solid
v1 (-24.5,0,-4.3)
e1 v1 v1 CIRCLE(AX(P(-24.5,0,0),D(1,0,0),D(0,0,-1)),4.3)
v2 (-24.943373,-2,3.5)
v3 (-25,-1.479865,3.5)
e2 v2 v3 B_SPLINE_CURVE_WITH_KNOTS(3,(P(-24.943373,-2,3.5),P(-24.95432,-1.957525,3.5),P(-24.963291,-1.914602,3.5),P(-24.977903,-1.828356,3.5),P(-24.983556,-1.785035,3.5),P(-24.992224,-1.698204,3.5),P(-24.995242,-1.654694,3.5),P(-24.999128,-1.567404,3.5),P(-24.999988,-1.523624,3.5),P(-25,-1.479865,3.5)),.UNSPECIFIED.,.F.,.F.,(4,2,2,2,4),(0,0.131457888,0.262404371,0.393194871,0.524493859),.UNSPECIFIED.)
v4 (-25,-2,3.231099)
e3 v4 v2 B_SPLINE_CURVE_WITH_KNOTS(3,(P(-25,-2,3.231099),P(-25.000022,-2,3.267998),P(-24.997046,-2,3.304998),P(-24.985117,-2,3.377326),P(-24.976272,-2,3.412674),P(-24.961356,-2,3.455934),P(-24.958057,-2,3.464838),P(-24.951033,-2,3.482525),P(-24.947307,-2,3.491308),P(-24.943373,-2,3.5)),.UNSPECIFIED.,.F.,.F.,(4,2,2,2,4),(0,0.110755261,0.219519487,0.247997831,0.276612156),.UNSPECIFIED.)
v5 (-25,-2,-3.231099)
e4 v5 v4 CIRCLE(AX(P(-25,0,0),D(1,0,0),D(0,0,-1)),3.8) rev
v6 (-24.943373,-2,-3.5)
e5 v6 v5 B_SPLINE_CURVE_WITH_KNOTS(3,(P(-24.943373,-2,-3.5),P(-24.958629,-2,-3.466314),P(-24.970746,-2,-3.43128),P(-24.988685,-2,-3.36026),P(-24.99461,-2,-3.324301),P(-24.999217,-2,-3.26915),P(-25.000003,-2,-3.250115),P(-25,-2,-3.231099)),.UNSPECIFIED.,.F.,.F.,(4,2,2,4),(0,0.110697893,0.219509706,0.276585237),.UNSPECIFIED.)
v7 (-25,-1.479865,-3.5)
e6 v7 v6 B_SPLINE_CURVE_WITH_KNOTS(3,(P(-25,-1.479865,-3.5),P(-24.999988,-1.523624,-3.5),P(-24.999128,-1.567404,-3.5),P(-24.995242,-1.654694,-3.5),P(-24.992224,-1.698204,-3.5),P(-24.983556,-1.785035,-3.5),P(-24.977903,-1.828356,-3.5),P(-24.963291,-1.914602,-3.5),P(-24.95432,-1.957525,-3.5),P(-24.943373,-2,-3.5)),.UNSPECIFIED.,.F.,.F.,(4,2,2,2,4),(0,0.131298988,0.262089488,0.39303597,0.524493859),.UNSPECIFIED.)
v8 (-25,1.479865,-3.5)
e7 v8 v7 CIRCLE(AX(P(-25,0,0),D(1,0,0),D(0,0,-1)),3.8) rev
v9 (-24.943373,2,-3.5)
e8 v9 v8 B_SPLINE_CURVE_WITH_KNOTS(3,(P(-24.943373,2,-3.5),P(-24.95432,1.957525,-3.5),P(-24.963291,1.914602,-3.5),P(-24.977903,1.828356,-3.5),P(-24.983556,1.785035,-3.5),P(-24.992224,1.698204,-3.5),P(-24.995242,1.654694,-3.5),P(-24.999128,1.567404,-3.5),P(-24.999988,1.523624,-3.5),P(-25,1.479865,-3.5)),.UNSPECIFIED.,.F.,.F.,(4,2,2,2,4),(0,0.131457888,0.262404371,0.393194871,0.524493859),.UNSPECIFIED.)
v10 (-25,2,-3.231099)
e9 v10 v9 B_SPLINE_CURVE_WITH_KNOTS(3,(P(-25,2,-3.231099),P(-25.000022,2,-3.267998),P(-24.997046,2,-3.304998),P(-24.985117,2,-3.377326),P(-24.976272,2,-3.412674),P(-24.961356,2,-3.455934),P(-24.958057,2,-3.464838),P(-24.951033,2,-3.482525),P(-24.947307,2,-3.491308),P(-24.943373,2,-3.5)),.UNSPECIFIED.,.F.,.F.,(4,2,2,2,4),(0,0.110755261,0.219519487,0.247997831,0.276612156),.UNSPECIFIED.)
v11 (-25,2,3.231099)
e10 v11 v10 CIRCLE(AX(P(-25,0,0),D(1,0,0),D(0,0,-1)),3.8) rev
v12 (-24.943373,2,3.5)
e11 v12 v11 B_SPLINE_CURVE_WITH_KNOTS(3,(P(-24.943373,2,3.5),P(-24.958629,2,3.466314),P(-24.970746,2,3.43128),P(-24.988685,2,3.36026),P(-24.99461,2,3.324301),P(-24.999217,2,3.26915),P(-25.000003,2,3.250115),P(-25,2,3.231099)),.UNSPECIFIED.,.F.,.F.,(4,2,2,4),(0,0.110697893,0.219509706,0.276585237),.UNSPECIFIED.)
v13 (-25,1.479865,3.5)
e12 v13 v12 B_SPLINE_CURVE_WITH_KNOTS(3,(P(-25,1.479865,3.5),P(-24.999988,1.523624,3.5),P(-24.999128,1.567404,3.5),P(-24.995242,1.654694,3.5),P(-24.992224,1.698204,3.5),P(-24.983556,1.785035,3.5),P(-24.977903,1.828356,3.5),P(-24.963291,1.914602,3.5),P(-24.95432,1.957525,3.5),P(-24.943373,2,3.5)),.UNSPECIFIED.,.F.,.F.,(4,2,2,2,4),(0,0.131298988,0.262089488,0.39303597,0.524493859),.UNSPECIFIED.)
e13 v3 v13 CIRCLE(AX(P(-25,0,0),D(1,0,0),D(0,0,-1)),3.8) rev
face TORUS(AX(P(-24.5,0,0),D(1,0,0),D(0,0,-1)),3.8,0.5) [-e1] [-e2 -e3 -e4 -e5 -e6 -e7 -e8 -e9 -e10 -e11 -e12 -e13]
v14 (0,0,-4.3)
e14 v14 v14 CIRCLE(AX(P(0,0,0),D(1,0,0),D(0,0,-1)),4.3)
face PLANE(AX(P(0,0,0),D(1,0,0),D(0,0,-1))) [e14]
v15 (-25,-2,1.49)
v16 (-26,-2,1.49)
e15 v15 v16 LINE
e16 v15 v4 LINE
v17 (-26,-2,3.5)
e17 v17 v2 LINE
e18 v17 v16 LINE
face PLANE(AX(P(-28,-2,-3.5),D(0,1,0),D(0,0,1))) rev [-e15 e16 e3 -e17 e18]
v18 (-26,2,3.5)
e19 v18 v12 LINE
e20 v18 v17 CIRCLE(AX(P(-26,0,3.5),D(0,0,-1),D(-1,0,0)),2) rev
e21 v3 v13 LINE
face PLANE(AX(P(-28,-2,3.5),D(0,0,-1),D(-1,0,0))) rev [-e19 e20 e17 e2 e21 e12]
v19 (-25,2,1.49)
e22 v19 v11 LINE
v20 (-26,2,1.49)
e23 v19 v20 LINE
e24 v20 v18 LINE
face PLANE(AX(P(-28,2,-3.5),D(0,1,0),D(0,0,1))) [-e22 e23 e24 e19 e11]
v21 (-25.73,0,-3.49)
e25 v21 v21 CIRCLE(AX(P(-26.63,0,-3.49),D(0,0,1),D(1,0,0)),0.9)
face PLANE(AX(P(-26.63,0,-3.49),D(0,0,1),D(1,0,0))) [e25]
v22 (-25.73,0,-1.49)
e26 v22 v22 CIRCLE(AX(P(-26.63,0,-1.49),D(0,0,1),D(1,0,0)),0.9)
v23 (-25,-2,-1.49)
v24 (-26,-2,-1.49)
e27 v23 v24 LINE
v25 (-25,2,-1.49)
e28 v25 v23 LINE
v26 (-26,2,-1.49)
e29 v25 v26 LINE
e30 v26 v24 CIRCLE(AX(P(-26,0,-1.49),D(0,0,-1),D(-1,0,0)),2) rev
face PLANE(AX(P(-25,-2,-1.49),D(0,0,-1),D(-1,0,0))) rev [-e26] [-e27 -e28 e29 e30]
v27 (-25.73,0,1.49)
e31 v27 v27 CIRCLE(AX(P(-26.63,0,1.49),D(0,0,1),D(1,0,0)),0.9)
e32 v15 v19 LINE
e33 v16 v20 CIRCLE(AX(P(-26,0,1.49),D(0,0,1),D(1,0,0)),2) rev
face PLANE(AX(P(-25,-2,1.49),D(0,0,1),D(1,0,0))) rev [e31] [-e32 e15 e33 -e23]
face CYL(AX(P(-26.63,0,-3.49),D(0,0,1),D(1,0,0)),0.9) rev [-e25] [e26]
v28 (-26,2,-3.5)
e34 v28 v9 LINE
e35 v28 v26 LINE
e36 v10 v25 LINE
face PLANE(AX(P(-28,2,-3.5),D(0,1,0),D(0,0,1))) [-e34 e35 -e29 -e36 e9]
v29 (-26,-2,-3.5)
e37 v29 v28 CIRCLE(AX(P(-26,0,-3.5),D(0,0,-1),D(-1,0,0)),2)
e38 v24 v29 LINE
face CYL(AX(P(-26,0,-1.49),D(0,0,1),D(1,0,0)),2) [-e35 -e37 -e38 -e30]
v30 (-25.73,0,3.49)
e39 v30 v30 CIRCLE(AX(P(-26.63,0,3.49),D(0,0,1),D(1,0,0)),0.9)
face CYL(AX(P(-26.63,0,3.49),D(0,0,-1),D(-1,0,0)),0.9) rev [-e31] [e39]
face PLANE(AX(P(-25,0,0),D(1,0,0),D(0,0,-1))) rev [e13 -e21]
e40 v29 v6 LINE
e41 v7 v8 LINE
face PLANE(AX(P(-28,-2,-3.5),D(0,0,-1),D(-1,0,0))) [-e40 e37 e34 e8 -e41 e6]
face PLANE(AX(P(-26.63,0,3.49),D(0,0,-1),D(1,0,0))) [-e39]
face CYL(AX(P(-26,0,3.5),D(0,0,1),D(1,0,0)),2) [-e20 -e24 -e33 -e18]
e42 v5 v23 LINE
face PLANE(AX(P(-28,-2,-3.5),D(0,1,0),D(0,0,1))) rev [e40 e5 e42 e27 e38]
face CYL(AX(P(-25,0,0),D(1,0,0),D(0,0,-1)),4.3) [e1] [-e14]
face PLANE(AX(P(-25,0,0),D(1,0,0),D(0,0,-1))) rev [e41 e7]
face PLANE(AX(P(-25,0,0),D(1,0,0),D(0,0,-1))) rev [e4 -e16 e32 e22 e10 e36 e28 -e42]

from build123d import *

# Parameters (mm, degrees)
ESBO_O4_R                = 4.3
RESSALTO_EXTRUS_O1_DEPTH = 25
ESBO_O5_W                = 7
ESBO_O5_H                = 4
RESSALTO_EXTRUS_O4_DEPTH = 3
ESBO_O7_W                = 2.98
ESBO_O7_H                = 4
CORTE_EXTRUS_O2_DEPTH    = 3
ESBO_O8_R                = 0.9
CORTE_EXTRUS_O3_DEPTH    = 2
FILETE2_RADIUS           = 2
FILETE2_LENGTH           = 2.01
FILETE3_RADIUS           = 2
FILETE3_LENGTH           = 2.01
FILETE4_R                = 0.5


with BuildPart() as part:
    # Esboço4 → Ressalto-extrusão1 (new body)
    with BuildSketch(Plane(origin=(0, 0, 0), x_dir=(0, 0, -1), z_dir=(1, 0, 0))):
        Circle(ESBO_O4_R)
    extrude(amount=-RESSALTO_EXTRUS_O1_DEPTH)

    # Esboço5 → Ressalto-extrusão4 (add)
    with BuildSketch(Plane.ZY.offset(25)):
        Rectangle(ESBO_O5_W, ESBO_O5_H)
    extrude(amount=RESSALTO_EXTRUS_O4_DEPTH)

    # Esboço7 → Corte-extrusão2 (cut)
    with BuildSketch(Plane.ZY.offset(28)):
        Rectangle(ESBO_O7_W, ESBO_O7_H)
    extrude(amount=-CORTE_EXTRUS_O2_DEPTH, mode=Mode.SUBTRACT)

    # Esboço8 → Corte-extrusão3 (cut)
    with BuildSketch(Plane.XY.offset(-1.49)):
        with Locations((-26.63, 0)):
            Circle(ESBO_O8_R)
    corte_extrus_o3 = extrude(amount=-CORTE_EXTRUS_O3_DEPTH, mode=Mode.SUBTRACT)

    # Filete2: full round fillet: the end face becomes a half cylinder, R = half its width
    filete2_face = Plane((-28, 0, -2.495), x_dir=(0, 0, -1), z_dir=(-1, 0, 0))  # on the end face: x along it, z out of the body
    filete2_slab = filete2_face.offset(-FILETE2_RADIUS / 2) * Box(FILETE2_LENGTH, 2 * FILETE2_RADIUS, FILETE2_RADIUS, mode=Mode.PRIVATE)  # the body's end, R deep
    filete2_round = Plane((-26, 0, -2.495), x_dir=(-1, 0, 0), z_dir=(0, 0, -1)) * Cylinder(FILETE2_RADIUS, FILETE2_LENGTH, mode=Mode.PRIVATE)  # its axis R under the face
    add(filete2_slab - filete2_round, mode=Mode.SUBTRACT)

    # Espelhar7: Corte-extrusão3 across plane
    add(corte_extrus_o3.mirror(Plane.XY), mode=Mode.SUBTRACT)

    # Filete3: full round fillet: the end face becomes a half cylinder, R = half its width
    filete3_face = Plane((-28, 0, 2.495), x_dir=(0, 0, 1), z_dir=(-1, 0, 0))  # on the end face: x along it, z out of the body
    filete3_slab = filete3_face.offset(-FILETE3_RADIUS / 2) * Box(FILETE3_LENGTH, 2 * FILETE3_RADIUS, FILETE3_RADIUS, mode=Mode.PRIVATE)  # the body's end, R deep
    filete3_round = Plane((-26, 0, 2.495), x_dir=(-1, 0, 0), z_dir=(0, 0, 1)) * Cylinder(FILETE3_RADIUS, FILETE3_LENGTH, mode=Mode.PRIVATE)  # its axis R under the face
    add(filete3_slab - filete3_round, mode=Mode.SUBTRACT)

    # Filete4
    # the kernel refuses this fillet: 0.5 mm, written as the material it takes off along each edge
    with BuildSketch(Plane(origin=(-25, 0, 0), x_dir=(0, 0, -1), z_dir=(0, -1, 0))) as filete4_piece_1_section:
        with BuildLine():
            CenterArc((4.3 - FILETE4_R, FILETE4_R), FILETE4_R, 270, 90)
            Line((4.3 - FILETE4_R, 0), (4.3, 0))
            Line((4.3, 0), (4.3, FILETE4_R))
        make_face()
    filete4_piece_1 = revolve(axis=Axis((-25, 0, 0), (1, 0, 0)), mode=Mode.PRIVATE)
    filete4_piece_1 = split(filete4_piece_1, bisect_by=Plane(origin=(-24.857838708, 1.067183876, -3.5), z_dir=(0, 0, -1)), keep=Keep.TOP, mode=Mode.PRIVATE)
    add(filete4_piece_1, mode=Mode.SUBTRACT)
    with BuildSketch(Plane(origin=(-25, 0, 0), x_dir=(0, 0, -1), z_dir=(0, -1, 0))) as filete4_piece_2_section:
        with BuildLine():
            CenterArc((4.3 - FILETE4_R, FILETE4_R), FILETE4_R, 270, 90)
            Line((4.3 - FILETE4_R, 0), (4.3, 0))
            Line((4.3, 0), (4.3, FILETE4_R))
        make_face()
    filete4_piece_2 = revolve(axis=Axis((-25, 0, 0), (1, 0, 0)), mode=Mode.PRIVATE)
    filete4_piece_2 = split(filete4_piece_2, bisect_by=Plane(origin=(-24.858947412, 2, 0), z_dir=(0, 1, 0)), keep=Keep.TOP, mode=Mode.PRIVATE)
    add(filete4_piece_2, mode=Mode.SUBTRACT)
    with BuildSketch(Plane(origin=(-25, 0, 0), x_dir=(0, 0, -1), z_dir=(0, -1, 0))) as filete4_piece_3_section:
        with BuildLine():
            CenterArc((4.3 - FILETE4_R, FILETE4_R), FILETE4_R, 270, 90)
            Line((4.3 - FILETE4_R, 0), (4.3, 0))
            Line((4.3, 0), (4.3, FILETE4_R))
        make_face()
    filete4_piece_3 = revolve(axis=Axis((-25, 0, 0), (1, 0, 0)), mode=Mode.PRIVATE)
    filete4_piece_3 = split(filete4_piece_3, bisect_by=Plane(origin=(-24.858947412, -2, 0), z_dir=(0, -1, 0)), keep=Keep.TOP, mode=Mode.PRIVATE)
    add(filete4_piece_3, mode=Mode.SUBTRACT)
    with BuildSketch(Plane(origin=(-25, 0, 0), x_dir=(0, 0, -1), z_dir=(0, -1, 0))) as filete4_piece_4_section:
        with BuildLine():
            CenterArc((4.3 - FILETE4_R, FILETE4_R), FILETE4_R, 270, 90)
            Line((4.3 - FILETE4_R, 0), (4.3, 0))
            Line((4.3, 0), (4.3, FILETE4_R))
        make_face()
    filete4_piece_4 = revolve(axis=Axis((-25, 0, 0), (1, 0, 0)), mode=Mode.PRIVATE)
    filete4_piece_4 = split(filete4_piece_4, bisect_by=Plane(origin=(-24.85783871, 0, 3.5), z_dir=(0, 0, 1)), keep=Keep.TOP, mode=Mode.PRIVATE)
    add(filete4_piece_4, mode=Mode.SUBTRACT)


solid = part.part
